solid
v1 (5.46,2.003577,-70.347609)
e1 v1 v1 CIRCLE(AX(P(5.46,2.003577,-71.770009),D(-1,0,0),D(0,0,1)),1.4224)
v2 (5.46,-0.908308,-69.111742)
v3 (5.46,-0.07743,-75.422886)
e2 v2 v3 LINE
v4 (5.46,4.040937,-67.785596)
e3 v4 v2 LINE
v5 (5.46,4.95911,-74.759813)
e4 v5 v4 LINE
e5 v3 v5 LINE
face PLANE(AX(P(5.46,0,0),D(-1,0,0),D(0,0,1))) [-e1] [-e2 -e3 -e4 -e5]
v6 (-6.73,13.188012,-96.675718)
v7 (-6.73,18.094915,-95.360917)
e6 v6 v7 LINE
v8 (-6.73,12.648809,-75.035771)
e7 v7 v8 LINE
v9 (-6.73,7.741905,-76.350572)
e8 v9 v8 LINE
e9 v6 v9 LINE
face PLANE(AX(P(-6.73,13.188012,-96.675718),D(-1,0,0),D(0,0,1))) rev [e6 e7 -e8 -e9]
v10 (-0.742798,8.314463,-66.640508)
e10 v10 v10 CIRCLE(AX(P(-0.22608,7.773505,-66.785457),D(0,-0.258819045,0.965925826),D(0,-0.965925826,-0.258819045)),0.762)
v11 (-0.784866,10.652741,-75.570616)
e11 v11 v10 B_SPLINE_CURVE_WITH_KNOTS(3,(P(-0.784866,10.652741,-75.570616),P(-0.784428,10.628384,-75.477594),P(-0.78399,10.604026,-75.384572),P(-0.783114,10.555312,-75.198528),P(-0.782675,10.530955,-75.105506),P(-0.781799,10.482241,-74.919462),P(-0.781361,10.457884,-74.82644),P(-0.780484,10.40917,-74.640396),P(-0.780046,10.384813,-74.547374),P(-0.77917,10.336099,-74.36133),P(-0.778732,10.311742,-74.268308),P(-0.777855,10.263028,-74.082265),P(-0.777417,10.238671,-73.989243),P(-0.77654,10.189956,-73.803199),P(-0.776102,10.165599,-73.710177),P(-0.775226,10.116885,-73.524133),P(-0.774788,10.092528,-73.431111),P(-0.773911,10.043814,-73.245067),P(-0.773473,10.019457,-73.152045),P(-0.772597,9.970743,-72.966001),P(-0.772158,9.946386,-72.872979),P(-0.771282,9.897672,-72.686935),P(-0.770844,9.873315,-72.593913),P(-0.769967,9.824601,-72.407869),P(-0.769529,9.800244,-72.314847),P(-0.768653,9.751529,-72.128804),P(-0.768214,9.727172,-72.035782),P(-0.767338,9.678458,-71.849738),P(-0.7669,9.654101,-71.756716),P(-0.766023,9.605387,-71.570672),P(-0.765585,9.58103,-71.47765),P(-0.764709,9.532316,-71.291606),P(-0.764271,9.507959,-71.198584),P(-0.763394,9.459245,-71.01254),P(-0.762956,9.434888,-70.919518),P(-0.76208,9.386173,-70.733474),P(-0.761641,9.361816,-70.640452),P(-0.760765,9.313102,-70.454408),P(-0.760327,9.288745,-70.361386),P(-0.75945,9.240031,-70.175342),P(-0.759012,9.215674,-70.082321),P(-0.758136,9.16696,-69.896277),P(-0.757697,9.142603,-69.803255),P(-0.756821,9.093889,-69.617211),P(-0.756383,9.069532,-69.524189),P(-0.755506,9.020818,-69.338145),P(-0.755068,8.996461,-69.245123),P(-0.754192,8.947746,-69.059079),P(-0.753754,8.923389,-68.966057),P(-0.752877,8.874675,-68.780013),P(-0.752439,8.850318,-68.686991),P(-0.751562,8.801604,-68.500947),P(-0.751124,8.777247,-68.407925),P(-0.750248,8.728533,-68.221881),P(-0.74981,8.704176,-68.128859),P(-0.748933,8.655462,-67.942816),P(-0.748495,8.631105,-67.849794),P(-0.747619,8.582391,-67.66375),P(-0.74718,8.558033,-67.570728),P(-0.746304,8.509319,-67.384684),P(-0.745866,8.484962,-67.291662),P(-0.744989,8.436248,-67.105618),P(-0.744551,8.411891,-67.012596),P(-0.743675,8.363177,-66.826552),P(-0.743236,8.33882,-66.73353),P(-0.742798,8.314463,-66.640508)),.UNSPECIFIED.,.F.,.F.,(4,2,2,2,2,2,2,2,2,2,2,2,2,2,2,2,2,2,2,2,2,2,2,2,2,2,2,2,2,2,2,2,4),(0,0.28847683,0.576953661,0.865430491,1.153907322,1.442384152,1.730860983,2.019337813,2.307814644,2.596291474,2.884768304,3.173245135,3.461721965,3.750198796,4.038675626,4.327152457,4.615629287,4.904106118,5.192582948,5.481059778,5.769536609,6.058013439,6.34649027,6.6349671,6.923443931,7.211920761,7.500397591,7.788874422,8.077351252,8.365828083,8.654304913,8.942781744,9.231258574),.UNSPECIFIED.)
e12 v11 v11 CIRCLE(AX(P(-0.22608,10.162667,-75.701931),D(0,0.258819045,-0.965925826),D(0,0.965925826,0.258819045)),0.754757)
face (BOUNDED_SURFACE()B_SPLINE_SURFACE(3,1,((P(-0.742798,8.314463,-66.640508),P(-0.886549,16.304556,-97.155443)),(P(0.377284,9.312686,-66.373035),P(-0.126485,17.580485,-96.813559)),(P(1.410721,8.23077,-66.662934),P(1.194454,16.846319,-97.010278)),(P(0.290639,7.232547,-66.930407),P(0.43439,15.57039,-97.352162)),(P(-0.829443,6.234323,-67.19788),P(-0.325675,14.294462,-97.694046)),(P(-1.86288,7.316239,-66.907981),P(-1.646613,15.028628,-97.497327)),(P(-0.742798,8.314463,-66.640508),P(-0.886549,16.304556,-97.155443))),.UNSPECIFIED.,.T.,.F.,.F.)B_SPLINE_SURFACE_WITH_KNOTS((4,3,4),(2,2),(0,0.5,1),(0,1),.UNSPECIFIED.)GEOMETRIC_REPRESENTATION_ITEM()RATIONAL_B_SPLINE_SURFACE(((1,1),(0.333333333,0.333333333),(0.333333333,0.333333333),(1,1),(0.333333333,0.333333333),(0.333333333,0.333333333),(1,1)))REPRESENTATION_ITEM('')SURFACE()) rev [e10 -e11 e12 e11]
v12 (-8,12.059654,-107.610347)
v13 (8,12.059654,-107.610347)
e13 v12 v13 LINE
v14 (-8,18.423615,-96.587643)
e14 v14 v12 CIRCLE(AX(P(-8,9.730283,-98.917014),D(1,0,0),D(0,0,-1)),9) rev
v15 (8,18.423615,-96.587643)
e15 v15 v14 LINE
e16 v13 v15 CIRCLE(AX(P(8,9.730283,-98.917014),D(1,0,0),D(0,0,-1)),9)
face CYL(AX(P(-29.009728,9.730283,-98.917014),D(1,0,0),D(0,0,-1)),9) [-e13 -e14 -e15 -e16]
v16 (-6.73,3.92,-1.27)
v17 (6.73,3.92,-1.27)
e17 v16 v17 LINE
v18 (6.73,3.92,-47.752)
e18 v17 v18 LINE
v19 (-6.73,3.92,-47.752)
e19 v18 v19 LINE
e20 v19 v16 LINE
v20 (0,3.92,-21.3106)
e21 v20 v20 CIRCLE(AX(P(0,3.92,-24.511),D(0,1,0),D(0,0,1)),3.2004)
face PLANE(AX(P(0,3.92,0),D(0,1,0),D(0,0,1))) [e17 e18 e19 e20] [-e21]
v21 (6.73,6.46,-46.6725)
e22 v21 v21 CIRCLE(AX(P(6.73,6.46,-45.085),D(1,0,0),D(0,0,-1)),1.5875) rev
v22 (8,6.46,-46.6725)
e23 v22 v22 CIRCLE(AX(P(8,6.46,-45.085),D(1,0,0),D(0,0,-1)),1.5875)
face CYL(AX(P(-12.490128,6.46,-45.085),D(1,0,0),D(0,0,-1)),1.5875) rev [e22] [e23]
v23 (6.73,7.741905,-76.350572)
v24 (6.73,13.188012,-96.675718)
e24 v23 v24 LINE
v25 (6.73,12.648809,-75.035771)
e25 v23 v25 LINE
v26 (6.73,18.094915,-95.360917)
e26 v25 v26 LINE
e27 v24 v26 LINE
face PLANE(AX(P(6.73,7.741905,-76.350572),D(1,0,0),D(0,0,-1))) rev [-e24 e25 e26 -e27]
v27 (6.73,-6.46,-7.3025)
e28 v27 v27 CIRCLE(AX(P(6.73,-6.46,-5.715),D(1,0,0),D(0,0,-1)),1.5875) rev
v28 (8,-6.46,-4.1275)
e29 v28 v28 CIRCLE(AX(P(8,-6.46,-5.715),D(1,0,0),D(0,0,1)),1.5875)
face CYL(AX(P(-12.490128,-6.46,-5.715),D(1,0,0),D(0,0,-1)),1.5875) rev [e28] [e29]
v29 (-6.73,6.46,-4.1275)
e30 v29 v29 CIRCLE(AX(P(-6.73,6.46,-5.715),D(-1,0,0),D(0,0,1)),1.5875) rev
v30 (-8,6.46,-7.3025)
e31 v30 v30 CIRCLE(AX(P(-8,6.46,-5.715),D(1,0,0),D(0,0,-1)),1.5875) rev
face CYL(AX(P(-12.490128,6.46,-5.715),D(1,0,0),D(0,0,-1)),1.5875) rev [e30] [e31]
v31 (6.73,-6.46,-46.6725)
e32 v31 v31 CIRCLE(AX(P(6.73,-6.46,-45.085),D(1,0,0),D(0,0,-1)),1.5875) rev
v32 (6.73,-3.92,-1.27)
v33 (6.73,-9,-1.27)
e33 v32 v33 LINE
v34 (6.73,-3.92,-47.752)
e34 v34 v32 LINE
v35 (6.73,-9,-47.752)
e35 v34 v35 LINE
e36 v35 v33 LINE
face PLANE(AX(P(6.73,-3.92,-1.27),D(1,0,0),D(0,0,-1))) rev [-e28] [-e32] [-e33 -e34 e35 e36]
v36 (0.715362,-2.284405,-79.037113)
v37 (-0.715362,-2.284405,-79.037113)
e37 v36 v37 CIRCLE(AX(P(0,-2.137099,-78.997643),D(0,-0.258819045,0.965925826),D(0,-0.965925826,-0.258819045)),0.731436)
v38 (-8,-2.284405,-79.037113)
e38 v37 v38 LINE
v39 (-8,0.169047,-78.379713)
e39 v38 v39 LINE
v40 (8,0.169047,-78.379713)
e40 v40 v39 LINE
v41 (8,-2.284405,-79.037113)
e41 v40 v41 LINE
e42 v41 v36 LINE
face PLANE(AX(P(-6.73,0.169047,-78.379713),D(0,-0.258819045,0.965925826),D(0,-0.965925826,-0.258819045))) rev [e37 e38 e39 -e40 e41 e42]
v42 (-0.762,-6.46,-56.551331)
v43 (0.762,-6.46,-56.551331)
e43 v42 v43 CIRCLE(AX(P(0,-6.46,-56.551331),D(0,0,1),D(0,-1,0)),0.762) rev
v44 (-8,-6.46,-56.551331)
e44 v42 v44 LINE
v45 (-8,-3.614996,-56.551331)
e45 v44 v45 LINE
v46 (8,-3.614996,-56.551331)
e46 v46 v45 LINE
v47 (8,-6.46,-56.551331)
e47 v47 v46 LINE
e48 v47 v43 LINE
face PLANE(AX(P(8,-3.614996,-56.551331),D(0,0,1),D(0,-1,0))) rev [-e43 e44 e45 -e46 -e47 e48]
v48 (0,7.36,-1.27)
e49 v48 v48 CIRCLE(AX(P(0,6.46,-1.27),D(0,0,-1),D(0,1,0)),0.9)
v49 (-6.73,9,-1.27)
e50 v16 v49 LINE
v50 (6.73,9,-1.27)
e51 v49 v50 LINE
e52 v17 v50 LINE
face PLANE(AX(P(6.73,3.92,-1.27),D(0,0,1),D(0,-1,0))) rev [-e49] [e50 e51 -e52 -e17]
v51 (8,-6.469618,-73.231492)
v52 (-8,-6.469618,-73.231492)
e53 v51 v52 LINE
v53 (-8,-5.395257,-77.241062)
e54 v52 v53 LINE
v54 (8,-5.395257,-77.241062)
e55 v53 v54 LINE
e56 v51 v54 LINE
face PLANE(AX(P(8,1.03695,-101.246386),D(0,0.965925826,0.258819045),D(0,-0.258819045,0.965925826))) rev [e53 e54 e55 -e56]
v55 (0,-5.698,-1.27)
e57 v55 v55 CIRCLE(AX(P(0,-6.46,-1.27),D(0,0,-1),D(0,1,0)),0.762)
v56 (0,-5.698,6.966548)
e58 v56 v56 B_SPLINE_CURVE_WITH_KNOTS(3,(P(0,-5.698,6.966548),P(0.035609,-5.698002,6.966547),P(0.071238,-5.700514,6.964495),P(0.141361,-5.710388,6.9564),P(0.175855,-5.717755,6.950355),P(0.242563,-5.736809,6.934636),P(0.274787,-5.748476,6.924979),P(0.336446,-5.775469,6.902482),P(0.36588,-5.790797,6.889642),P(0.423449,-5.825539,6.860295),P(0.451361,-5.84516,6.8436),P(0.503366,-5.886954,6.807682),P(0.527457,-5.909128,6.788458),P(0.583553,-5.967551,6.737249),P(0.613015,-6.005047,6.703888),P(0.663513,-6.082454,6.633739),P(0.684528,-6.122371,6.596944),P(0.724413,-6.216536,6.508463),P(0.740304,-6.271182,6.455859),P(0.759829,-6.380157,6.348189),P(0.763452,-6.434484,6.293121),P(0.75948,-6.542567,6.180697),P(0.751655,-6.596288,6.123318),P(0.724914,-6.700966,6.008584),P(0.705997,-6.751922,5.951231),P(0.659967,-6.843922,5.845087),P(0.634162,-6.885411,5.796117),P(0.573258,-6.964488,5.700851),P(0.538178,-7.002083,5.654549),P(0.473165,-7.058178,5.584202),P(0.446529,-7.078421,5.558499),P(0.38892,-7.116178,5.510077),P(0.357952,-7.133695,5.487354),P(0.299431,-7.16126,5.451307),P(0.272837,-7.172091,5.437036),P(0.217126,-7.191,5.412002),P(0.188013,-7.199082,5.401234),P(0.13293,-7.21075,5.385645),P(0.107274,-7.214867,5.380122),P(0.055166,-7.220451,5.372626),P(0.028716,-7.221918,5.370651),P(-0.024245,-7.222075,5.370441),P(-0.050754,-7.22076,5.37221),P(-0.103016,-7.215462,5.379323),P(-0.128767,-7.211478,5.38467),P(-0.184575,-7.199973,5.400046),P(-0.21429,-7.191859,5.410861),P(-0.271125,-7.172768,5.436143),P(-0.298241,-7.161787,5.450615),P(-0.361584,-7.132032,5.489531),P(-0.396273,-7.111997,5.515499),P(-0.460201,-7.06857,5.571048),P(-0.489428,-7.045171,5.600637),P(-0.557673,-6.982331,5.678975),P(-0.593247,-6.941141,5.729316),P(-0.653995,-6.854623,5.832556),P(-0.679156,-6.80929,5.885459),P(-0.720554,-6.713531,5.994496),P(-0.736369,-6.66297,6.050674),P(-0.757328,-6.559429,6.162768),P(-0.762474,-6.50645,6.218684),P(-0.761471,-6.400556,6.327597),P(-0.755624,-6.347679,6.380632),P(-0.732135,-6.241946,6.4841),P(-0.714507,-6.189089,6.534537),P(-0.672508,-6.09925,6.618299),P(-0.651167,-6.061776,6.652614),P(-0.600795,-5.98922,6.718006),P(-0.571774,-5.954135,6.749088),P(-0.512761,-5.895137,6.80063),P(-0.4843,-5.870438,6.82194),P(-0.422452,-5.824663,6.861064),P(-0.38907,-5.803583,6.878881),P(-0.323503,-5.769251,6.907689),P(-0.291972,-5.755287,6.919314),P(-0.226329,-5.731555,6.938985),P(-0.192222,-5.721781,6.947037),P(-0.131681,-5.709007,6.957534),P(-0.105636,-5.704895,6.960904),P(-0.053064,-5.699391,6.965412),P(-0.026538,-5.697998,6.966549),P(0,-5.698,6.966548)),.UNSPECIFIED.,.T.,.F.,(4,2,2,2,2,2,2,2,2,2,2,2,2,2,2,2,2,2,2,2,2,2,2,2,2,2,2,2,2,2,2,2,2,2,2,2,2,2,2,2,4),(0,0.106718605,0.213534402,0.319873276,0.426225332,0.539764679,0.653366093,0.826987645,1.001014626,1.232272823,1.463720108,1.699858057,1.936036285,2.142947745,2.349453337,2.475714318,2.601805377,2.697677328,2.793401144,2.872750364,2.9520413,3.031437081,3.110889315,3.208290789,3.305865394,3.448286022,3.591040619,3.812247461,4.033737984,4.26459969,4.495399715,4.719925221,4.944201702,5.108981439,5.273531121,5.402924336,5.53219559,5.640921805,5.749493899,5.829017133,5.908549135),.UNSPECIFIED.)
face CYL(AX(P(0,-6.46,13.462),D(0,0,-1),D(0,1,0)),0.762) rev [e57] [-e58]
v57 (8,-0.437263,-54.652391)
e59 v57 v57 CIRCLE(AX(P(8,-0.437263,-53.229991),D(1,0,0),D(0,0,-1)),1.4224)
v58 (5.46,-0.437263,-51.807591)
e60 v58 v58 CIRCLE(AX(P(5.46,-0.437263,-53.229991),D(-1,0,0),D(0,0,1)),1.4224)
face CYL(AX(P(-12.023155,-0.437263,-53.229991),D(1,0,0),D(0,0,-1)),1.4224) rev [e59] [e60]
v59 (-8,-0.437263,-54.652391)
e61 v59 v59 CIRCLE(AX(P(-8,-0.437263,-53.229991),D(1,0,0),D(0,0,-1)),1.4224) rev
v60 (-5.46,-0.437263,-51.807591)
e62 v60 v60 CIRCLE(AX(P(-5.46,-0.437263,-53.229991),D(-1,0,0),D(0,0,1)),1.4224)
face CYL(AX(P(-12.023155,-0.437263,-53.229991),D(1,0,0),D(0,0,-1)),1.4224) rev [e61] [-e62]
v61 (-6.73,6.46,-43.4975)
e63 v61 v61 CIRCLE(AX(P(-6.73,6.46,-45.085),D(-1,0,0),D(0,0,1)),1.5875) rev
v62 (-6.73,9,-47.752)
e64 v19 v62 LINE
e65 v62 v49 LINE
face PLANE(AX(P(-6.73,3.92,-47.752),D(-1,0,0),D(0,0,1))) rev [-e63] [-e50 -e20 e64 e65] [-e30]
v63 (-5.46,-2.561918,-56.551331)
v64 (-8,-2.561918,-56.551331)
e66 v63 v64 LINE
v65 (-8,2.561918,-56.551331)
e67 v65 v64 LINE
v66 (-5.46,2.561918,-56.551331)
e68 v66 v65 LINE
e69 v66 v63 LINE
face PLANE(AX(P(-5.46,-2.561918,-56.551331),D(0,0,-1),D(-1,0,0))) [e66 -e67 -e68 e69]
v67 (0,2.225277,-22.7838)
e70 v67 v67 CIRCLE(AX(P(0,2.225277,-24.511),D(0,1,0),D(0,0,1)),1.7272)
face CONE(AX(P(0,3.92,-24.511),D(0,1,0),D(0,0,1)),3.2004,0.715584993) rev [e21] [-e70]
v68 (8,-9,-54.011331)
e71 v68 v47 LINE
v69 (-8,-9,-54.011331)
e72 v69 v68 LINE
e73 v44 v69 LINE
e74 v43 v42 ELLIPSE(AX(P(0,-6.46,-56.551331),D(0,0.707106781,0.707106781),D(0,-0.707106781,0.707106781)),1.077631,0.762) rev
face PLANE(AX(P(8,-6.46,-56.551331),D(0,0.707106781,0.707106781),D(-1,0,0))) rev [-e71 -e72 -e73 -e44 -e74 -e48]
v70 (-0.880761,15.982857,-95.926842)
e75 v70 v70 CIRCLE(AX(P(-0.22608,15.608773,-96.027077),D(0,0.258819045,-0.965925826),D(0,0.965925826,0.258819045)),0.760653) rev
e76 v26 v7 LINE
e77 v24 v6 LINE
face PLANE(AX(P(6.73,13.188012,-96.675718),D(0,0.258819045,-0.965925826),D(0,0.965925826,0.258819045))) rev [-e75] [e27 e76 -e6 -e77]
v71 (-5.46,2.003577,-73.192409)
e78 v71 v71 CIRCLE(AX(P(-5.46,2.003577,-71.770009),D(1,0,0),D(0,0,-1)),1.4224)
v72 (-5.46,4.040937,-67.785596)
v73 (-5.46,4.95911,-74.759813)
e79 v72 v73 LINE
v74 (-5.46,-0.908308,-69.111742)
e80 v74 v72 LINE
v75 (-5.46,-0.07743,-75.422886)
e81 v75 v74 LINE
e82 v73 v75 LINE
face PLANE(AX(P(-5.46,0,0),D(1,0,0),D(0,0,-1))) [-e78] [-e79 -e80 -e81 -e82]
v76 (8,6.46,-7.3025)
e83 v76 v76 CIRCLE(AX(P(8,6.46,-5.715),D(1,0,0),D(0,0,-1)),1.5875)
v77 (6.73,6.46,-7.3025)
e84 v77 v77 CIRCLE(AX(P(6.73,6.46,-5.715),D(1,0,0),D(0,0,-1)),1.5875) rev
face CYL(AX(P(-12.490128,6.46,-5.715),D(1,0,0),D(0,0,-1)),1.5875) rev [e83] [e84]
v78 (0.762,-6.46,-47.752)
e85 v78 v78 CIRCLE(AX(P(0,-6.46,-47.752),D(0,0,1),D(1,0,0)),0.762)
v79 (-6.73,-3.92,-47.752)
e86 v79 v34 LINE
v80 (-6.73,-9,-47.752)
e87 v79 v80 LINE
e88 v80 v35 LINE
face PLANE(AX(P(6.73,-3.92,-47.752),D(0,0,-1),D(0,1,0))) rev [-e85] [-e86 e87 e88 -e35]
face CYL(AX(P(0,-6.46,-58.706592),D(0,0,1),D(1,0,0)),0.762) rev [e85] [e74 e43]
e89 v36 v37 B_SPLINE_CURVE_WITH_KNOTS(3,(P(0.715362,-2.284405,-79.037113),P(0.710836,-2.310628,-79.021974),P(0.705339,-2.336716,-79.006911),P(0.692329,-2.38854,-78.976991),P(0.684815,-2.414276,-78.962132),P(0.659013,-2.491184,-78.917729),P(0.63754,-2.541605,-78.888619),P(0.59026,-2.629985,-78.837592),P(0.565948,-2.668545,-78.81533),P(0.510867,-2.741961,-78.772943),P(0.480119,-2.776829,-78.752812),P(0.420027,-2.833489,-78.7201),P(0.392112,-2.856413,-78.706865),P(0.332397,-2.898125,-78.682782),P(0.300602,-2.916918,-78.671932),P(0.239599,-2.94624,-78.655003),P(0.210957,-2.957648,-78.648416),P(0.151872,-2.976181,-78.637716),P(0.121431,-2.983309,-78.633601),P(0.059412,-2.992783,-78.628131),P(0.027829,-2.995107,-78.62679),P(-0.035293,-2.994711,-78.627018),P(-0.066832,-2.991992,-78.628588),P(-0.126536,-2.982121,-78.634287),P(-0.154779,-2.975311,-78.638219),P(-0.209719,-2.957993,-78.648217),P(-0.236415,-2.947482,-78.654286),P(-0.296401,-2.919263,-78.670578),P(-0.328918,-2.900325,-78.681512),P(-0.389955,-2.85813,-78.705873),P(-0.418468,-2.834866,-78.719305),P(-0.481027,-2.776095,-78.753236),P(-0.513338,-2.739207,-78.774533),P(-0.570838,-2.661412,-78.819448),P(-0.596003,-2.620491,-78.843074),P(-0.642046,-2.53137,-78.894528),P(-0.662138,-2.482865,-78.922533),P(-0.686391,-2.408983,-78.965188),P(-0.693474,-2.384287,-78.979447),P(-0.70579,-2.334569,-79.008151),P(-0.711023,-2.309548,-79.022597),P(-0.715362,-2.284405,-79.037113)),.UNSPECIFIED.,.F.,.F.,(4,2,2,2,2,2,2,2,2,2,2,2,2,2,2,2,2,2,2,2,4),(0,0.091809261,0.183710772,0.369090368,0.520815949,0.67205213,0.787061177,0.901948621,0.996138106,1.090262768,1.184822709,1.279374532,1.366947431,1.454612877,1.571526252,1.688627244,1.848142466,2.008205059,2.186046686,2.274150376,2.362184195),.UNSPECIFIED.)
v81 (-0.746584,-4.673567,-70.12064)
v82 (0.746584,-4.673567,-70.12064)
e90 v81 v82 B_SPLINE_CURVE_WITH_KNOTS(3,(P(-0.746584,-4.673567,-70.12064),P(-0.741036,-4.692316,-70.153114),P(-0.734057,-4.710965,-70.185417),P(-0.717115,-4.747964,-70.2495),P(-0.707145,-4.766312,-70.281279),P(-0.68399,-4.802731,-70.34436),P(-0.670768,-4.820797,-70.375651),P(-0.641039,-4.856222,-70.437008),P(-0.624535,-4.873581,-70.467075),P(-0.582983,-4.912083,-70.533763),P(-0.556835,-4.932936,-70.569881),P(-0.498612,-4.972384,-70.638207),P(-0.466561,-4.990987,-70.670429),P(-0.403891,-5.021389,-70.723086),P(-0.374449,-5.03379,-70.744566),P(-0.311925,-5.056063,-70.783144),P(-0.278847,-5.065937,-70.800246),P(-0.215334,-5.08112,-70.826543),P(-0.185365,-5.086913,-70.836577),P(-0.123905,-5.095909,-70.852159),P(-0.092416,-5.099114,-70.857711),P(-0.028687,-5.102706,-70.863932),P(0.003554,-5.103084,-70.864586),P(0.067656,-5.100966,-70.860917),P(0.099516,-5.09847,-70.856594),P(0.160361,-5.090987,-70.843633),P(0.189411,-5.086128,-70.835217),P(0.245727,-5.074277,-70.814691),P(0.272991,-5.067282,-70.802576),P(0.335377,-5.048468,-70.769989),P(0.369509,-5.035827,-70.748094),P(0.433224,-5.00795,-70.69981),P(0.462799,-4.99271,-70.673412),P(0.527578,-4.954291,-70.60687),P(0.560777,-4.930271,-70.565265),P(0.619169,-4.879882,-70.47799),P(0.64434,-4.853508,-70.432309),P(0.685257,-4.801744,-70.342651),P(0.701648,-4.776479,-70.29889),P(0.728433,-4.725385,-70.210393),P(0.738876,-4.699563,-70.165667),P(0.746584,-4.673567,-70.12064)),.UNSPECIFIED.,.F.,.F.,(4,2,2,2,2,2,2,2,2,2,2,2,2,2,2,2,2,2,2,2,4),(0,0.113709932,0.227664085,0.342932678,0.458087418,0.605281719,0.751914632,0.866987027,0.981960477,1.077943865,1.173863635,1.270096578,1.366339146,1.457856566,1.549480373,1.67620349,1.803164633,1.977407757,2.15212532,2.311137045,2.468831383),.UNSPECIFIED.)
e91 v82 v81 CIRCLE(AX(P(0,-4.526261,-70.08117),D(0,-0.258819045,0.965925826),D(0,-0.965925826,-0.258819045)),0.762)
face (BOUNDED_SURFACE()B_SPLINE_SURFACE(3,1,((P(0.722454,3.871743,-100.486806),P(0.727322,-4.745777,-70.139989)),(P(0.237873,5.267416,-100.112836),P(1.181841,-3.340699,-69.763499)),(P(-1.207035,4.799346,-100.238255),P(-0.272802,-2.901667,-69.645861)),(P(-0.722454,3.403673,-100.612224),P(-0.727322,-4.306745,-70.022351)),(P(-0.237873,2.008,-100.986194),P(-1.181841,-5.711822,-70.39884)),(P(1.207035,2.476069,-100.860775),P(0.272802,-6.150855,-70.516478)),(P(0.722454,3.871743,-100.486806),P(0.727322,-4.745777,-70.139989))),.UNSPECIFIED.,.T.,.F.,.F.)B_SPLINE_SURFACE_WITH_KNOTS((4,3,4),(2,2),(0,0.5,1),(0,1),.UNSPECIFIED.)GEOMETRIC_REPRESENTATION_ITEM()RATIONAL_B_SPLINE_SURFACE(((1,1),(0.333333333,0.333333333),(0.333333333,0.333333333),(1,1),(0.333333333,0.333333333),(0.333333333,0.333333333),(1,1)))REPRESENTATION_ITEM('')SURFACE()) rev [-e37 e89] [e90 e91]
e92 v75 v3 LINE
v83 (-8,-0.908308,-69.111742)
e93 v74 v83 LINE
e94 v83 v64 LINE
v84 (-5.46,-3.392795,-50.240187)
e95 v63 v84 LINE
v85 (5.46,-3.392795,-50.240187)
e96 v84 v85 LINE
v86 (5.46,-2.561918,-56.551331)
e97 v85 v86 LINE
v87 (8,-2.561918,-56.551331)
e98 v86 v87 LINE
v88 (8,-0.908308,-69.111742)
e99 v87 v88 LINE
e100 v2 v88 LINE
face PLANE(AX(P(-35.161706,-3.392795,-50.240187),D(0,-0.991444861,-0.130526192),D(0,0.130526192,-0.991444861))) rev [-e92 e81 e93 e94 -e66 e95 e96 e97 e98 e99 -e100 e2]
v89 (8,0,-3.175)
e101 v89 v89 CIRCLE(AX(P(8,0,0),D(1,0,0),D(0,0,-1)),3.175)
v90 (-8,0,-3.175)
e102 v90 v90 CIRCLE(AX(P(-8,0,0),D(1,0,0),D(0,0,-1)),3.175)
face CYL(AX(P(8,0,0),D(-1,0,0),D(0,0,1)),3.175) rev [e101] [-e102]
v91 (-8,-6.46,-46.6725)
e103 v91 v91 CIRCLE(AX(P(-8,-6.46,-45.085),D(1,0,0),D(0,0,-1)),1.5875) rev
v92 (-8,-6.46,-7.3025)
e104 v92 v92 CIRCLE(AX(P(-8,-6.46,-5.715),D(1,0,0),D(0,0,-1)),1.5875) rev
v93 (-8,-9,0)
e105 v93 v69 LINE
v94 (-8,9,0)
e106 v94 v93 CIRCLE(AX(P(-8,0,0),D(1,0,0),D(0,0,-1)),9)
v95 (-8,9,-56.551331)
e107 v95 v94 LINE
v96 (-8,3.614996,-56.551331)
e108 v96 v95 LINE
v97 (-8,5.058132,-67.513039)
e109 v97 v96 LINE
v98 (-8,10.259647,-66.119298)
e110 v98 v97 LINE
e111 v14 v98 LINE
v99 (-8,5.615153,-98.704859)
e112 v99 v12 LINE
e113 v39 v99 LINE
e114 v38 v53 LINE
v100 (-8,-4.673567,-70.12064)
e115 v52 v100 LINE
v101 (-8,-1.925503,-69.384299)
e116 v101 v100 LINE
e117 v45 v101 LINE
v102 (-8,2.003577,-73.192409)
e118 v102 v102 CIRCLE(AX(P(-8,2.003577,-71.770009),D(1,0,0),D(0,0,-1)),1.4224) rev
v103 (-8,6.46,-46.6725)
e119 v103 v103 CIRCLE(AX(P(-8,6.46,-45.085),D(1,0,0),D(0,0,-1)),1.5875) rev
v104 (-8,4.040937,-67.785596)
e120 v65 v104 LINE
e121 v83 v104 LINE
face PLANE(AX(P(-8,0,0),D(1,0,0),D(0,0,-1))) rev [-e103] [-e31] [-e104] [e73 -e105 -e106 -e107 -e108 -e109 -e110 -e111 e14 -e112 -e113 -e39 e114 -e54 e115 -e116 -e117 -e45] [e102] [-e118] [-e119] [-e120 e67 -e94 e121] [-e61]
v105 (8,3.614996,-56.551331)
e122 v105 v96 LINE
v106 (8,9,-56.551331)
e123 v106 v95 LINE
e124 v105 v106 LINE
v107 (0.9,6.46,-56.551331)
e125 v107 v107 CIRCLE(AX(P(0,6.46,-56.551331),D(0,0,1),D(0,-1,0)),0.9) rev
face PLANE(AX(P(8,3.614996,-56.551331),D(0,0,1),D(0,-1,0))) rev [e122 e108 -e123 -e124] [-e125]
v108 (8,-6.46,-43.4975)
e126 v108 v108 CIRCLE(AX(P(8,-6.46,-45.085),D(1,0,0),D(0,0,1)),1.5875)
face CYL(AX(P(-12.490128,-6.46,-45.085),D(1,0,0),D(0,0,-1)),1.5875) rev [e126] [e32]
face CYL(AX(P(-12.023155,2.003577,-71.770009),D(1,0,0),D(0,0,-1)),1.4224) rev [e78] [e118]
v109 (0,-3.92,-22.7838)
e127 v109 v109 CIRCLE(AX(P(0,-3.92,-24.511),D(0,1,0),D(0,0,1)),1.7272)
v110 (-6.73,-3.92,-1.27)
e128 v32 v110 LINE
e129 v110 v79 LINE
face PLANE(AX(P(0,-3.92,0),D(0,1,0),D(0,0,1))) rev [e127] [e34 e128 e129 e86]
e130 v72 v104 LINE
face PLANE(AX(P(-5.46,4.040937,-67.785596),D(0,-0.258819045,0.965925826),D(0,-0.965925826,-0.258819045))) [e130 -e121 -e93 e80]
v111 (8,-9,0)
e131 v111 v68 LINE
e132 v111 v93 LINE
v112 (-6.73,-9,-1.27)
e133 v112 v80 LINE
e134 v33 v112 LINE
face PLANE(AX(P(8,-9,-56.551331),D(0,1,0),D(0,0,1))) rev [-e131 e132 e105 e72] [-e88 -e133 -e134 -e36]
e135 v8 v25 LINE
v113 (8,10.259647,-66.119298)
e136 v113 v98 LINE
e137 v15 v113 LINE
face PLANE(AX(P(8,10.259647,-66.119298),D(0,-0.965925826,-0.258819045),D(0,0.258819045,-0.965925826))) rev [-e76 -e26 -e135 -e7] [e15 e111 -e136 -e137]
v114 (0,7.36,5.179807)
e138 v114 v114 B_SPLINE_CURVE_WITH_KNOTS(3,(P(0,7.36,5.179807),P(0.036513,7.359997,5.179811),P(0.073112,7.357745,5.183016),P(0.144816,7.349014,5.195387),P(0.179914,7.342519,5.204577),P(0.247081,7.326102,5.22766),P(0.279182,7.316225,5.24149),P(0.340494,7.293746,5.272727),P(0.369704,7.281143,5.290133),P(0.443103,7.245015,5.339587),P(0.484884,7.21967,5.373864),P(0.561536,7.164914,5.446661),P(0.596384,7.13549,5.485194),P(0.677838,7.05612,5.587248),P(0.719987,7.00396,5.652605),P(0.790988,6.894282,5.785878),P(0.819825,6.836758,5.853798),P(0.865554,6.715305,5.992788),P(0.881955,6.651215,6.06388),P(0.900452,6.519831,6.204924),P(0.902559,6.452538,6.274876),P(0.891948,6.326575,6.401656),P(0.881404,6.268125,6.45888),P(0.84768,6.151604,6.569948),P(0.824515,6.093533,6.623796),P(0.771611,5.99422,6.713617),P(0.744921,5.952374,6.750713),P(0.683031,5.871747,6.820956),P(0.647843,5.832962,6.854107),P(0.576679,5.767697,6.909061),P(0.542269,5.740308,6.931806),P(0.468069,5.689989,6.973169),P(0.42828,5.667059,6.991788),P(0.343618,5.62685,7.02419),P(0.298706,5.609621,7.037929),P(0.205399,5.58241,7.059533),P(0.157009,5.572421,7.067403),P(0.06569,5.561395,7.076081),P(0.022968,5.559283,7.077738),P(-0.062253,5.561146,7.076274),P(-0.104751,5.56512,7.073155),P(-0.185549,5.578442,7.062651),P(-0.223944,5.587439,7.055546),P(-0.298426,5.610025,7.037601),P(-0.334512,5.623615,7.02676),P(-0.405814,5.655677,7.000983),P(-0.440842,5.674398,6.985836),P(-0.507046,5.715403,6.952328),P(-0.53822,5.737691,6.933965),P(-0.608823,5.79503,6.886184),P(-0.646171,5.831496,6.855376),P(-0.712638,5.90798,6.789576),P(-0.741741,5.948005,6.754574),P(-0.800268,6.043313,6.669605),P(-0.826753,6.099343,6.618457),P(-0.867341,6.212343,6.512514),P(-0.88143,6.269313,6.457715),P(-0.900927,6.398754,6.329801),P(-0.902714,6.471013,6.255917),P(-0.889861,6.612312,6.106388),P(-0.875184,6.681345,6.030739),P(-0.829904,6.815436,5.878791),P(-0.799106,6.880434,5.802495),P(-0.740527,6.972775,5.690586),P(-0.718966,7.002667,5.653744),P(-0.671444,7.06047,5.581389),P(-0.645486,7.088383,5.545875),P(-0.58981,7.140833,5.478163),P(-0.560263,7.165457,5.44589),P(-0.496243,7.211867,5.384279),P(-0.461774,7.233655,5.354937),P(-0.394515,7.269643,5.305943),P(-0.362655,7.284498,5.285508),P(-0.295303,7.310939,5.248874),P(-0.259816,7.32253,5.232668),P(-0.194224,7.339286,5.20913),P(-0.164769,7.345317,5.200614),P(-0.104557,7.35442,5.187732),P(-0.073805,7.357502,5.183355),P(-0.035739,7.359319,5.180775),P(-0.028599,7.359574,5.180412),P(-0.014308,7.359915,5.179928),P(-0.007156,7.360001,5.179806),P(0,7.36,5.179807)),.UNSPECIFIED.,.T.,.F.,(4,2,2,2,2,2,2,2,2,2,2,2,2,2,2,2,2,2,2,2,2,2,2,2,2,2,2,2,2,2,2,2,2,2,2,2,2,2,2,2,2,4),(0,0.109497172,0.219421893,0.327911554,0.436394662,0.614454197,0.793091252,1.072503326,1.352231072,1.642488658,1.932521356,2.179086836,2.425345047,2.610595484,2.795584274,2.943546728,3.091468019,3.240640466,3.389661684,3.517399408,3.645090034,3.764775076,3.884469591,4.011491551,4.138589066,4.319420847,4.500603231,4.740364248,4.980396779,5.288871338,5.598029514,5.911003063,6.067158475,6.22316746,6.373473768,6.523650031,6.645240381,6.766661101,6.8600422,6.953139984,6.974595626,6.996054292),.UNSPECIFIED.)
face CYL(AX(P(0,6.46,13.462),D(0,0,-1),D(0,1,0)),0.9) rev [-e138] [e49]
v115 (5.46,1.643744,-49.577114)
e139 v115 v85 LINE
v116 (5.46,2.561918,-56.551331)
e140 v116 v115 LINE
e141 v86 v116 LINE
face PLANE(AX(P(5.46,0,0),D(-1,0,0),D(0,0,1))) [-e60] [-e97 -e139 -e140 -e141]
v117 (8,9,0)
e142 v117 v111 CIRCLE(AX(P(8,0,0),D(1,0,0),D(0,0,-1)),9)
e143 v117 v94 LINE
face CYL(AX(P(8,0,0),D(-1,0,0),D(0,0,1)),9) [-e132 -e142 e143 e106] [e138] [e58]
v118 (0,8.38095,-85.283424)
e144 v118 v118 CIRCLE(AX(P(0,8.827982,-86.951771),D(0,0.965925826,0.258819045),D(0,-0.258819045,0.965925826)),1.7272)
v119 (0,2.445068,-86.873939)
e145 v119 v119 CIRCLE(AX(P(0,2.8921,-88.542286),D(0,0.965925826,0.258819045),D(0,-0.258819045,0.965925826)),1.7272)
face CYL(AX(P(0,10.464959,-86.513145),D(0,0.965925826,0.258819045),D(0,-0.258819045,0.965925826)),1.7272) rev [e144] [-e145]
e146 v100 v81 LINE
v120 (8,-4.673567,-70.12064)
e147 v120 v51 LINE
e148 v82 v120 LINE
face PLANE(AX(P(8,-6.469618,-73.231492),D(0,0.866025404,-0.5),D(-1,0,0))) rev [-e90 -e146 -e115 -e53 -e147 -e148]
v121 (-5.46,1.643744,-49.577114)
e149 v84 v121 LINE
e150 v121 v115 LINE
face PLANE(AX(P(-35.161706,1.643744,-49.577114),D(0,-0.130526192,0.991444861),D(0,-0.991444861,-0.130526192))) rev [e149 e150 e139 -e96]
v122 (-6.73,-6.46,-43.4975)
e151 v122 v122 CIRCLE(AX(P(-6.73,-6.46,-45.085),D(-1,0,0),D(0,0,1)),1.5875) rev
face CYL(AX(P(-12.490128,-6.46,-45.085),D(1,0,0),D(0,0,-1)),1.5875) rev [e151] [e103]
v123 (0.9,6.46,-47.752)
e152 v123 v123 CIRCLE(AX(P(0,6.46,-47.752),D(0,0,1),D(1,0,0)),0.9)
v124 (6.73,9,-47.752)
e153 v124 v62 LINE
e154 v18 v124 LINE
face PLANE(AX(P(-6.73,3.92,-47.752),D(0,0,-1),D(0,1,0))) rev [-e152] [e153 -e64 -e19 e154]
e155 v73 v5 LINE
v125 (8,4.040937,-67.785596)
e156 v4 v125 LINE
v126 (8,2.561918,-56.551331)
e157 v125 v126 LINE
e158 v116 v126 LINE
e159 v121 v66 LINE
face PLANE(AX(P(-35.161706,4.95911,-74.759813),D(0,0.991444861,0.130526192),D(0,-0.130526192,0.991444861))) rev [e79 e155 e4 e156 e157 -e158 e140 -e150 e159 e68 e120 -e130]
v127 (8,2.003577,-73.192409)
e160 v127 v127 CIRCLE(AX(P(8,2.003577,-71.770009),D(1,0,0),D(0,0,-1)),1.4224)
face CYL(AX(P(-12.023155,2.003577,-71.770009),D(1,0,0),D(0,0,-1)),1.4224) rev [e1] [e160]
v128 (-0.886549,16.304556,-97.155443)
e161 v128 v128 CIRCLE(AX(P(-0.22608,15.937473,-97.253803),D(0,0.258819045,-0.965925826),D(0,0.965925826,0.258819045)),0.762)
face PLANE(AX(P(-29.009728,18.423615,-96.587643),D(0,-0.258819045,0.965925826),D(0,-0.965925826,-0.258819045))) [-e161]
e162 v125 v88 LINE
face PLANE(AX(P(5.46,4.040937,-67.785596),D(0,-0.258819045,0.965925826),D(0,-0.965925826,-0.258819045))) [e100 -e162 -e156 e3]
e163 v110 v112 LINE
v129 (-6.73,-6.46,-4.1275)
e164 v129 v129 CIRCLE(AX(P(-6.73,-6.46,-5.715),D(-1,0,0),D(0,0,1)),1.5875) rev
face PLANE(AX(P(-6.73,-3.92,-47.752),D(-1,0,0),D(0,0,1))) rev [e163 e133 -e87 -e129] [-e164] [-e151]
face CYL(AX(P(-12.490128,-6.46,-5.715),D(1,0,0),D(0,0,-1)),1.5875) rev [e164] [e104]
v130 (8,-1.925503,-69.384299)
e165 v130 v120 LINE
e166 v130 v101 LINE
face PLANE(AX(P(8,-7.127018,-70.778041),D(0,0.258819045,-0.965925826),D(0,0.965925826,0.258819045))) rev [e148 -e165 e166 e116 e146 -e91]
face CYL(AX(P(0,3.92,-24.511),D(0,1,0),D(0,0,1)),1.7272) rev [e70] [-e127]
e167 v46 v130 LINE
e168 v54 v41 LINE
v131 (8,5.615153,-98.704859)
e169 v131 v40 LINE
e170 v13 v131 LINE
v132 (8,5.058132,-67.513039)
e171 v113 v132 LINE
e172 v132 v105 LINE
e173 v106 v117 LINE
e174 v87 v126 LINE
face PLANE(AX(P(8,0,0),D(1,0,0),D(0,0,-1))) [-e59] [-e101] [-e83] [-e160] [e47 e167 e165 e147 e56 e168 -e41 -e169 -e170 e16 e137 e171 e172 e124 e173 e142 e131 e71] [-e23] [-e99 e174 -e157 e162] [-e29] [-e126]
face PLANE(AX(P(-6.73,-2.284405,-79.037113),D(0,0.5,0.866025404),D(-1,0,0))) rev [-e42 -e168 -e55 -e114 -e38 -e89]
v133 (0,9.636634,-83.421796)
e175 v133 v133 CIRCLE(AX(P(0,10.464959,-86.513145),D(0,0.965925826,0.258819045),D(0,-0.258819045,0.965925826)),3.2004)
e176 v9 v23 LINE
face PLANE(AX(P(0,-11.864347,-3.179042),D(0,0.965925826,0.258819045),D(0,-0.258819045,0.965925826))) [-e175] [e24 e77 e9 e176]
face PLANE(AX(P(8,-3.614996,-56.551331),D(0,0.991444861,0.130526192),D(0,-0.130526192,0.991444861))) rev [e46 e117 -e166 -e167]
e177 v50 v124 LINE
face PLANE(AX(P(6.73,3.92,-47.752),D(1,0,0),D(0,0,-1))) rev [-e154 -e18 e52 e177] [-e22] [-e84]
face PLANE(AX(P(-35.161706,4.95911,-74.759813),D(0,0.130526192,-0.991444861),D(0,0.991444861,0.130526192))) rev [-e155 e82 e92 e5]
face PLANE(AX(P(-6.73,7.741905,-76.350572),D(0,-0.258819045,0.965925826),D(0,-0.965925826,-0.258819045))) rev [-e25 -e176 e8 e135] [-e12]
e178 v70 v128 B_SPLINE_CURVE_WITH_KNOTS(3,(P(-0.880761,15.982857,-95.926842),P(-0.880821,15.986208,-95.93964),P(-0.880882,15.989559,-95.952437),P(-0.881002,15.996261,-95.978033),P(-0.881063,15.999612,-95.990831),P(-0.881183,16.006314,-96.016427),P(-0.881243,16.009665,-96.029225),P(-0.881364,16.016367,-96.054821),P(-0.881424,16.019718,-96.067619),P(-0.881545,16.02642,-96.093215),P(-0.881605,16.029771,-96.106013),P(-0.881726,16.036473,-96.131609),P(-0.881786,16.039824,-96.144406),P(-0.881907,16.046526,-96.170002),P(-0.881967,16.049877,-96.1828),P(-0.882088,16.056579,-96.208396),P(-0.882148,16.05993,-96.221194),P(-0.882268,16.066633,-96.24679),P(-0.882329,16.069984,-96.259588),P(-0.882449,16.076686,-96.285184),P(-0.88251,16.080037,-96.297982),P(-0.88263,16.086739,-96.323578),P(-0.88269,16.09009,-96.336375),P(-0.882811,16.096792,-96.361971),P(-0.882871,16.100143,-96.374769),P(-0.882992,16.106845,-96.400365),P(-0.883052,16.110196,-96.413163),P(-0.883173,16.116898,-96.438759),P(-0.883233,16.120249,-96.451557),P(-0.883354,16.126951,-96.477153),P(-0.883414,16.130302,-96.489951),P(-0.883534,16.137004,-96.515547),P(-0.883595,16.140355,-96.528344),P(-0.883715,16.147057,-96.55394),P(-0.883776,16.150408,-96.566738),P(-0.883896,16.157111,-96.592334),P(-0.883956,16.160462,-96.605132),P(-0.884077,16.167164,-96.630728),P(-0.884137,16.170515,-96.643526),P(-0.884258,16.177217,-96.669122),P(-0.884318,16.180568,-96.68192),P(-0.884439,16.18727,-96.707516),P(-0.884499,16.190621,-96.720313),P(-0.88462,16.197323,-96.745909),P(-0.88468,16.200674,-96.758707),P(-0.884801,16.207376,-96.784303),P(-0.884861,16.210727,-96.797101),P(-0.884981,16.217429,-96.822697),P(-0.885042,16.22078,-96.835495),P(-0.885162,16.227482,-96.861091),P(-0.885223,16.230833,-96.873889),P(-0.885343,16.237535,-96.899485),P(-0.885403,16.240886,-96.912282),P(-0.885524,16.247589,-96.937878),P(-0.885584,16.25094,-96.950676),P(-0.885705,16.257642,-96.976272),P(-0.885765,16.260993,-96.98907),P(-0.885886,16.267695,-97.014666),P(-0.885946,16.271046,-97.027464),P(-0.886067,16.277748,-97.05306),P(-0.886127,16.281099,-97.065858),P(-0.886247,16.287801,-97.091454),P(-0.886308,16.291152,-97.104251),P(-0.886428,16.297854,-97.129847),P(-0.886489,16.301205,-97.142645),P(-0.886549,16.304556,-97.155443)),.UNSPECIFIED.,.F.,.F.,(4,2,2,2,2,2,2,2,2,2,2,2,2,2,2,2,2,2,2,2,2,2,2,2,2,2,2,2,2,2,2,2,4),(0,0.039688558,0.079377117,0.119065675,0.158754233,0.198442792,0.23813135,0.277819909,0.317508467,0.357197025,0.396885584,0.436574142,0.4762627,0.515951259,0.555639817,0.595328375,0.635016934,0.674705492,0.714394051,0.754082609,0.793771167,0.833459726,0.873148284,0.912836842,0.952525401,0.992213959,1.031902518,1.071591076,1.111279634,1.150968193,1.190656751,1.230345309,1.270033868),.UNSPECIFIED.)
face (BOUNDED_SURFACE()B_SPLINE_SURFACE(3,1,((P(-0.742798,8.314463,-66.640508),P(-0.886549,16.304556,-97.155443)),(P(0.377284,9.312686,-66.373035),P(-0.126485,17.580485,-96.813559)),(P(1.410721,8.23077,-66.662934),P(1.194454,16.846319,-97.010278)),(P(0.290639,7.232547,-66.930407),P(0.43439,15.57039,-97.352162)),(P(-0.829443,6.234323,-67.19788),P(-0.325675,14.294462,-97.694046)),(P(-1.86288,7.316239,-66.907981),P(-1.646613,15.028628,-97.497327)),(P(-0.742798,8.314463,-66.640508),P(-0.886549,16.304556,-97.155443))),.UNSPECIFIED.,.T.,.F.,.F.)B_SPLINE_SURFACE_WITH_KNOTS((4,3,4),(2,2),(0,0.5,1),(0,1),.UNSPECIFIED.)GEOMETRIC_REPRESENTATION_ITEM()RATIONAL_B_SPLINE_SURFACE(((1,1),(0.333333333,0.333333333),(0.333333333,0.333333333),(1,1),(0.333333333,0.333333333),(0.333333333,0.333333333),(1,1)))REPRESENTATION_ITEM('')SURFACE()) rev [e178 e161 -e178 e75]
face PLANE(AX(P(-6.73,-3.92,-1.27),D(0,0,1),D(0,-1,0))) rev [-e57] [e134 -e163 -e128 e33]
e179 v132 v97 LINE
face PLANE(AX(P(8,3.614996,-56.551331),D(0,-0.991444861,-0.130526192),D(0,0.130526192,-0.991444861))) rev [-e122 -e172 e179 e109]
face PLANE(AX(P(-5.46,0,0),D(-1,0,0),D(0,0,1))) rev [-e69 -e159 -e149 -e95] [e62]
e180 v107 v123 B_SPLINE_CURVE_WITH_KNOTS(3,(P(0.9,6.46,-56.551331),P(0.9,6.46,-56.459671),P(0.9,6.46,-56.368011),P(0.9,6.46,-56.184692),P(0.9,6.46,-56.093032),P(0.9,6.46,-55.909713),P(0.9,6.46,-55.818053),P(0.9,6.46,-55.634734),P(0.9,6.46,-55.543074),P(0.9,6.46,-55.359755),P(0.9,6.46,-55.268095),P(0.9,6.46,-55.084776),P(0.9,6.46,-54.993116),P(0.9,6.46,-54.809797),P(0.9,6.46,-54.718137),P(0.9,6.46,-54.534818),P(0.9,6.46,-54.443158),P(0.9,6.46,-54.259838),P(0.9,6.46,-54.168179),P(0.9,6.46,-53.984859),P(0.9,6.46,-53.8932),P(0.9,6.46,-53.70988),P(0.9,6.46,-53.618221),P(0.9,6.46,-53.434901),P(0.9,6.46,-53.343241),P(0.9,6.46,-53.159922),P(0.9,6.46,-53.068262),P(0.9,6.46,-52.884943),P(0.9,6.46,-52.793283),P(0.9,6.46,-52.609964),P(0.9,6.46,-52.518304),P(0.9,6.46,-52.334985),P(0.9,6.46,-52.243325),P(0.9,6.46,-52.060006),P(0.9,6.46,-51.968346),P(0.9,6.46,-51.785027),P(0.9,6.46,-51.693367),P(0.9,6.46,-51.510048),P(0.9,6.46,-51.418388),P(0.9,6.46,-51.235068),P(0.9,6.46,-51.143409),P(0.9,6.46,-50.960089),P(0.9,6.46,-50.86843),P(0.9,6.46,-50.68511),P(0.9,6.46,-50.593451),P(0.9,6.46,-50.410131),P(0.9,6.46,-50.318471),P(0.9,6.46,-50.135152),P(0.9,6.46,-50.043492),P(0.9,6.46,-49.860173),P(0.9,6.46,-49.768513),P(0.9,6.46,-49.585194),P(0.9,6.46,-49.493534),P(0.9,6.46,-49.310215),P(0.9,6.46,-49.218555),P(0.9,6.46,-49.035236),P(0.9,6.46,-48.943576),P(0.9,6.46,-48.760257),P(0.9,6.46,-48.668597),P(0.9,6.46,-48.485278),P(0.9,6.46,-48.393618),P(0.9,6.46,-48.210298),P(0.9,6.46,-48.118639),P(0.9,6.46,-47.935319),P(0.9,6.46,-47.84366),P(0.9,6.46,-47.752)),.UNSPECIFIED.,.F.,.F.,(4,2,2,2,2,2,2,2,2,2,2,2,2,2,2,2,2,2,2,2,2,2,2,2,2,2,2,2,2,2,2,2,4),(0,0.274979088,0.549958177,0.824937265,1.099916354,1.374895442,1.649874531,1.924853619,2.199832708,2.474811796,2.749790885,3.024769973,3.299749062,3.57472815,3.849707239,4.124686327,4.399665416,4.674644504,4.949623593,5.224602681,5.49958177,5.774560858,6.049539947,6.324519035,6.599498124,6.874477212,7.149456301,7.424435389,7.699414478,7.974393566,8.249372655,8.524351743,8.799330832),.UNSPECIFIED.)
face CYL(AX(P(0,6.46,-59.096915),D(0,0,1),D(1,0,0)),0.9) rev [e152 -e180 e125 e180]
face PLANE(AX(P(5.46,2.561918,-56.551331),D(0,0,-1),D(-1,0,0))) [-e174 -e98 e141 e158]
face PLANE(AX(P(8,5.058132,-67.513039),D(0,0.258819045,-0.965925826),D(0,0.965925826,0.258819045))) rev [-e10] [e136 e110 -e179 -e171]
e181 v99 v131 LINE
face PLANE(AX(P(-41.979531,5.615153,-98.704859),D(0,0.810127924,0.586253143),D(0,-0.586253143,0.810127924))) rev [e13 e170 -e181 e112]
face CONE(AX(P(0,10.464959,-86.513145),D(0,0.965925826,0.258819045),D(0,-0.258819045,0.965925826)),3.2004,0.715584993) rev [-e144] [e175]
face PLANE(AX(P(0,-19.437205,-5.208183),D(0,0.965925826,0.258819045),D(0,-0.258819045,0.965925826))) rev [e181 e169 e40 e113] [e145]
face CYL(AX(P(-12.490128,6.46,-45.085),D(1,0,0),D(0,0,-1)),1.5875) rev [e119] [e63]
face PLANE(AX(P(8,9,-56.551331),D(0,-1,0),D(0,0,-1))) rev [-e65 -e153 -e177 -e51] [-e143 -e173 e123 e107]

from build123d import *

# Parameters (mm, degrees)
SKETCH1_R                                      = 3.175
FINGER_FRAME_DEPTH                             = 8
SKETCH31_R                                     = 1.5875
F_1ST_DIGIT_DOWEL_PINS_DEPTH                   = 16
SKETCH32_W                                     = 13.46
SKETCH32_H                                     = 46.482
F_1ST_DIGIT_TOP_SURFACE_CUTAWAY_DEPTH          = 5.08
SKETCH33_W                                     = 13.46
SKETCH33_H                                     = 46.482
F_1ST_DIGIT_BOTTOM_SURFACE_CUTAWAY_DEPTH       = 5.08
SKETCH34_R                                     = 0.9
F_1ST_DIGIT_INLET_HOLE_DEPTH                   = 14.732
F_1ST_START                                    = -8.799330832
SKETCH35_R                                     = 0.9
F_1ST_DIGIT_OUTLET_HOLE_DEPTH                  = 8.799330832
F_1ST_DIGIT_INLET_HOLE_EXTENSOR_DEPTH          = 14.732
SKETCH37_R                                     = 0.762
F_1ST_DIGIT_OUTLET_HOLE_EXTENSOR_DEPTH         = 8.799330832
WAFFLE_AREA_DEPTH                              = 16
SKETCH52_W                                     = 13.46
SKETCH52_H                                     = 21.042139732
CUT_EXTRUDE12_DEPTH                            = 5.08
SKETCH53_W                                     = 13.46
SKETCH53_H                                     = 21.042139732
CUT_EXTRUDE13_DEPTH                            = 5.08
BOSS_EXTRUDE1_DEPTH                            = 16
CUT_EXTRUDE14_DEPTH                            = 16
CHAMFER2_SIZE                                  = 2.54
CSK_FOR_5_FLAT_HEAD_MACHINE_SCREW5_D           = 3.4544
CSK_FOR_5_FLAT_HEAD_MACHINE_SCREW5_CSINK_D     = 6.4008
CSK_FOR_5_FLAT_HEAD_MACHINE_SCREW5_CSINK_ANGLE = 82
CSK_FOR_5_FLAT_HEAD_MACHINE_SCREW6_D           = 3.4544
CSK_FOR_5_FLAT_HEAD_MACHINE_SCREW6_CSINK_D     = 6.4008
CSK_FOR_5_FLAT_HEAD_MACHINE_SCREW6_CSINK_ANGLE = 82
BOSS_EXTRUDE2_DEPTH                            = 2.54
BOSS_EXTRUDE3_DEPTH                            = 2.54
CUT_EXTRUDE15_START                            = -16
SKETCH64_R                                     = 1.4224
CUT_EXTRUDE15_DEPTH                            = 16


with BuildPart() as part:
    # Sketch1 → Finger Frame (new, symmetric)
    with BuildSketch(Plane(origin=(0, 0, 0), x_dir=(0, 0, -1), z_dir=(1, 0, 0))):
        with BuildLine():
            Line((56.551330832, 3.614995505), (67.513039484, 5.058131827))
            Line((67.513039484, 5.058131827), (66.119297762, 10.259646743))
            Line((66.119297762, 10.259646743), (96.587643055, 18.423615259))
            Line((96.587643055, 18.423615259), (101.246385867, 1.036950386))
            Line((101.246385867, 1.036950386), (70.778040574, -7.12701813))
            Line((70.778040574, -7.12701813), (69.384298853, -1.925503214))
            Line((69.384298853, -1.925503214), (56.551330832, -3.614995505))
            Line((56.551330832, -3.614995505), (56.551330832, -9))
            Line((56.551330832, -9), (0, -9))
            ThreePointArc((0, -9), (-9, 0), (0, 9))
            Line((0, 9), (56.551330832, 9))
            Line((56.551330832, 9), (56.551330832, 3.614995505))
        make_face()
        Circle(SKETCH1_R, mode=Mode.SUBTRACT)
    extrude(amount=FINGER_FRAME_DEPTH, both=True)

    # Sketch31 → 1st Digit Dowel Pins (cut)
    with BuildSketch(Plane(origin=(8, 0, 0), x_dir=(0, 0, -1), z_dir=(1, 0, 0))):
        with Locations((5.715, 6.46)):
            Circle(SKETCH31_R)
        with Locations((45.085, 6.46)):
            Circle(SKETCH31_R)
        with Locations((45.085, -6.46)):
            Circle(SKETCH31_R)
        with Locations((5.715, -6.46)):
            Circle(SKETCH31_R)
    extrude(amount=-F_1ST_DIGIT_DOWEL_PINS_DEPTH, mode=Mode.SUBTRACT)

    # Sketch32 → 1st Digit Top Surface Cutaway (cut)
    with BuildSketch(Plane(origin=(0, 9, 0), x_dir=(1, 0, 0), z_dir=(0, 1, 0))):
        with Locations((0, 24.511)):
            Rectangle(SKETCH32_W, SKETCH32_H)
    extrude(amount=-F_1ST_DIGIT_TOP_SURFACE_CUTAWAY_DEPTH, mode=Mode.SUBTRACT)

    # Sketch33 → 1st Digit Bottom Surface Cutaway (cut)
    with BuildSketch(Plane.XZ.offset(9)):
        with Locations((0, -24.511)):
            Rectangle(SKETCH33_W, SKETCH33_H)
    extrude(amount=-F_1ST_DIGIT_BOTTOM_SURFACE_CUTAWAY_DEPTH, mode=Mode.SUBTRACT)

    # Sketch34 → 1st Digit Inlet Hole (cut)
    with BuildSketch(Plane(origin=(0, 0, -1.27), x_dir=(-1, 0, 0), z_dir=(0, 0, -1))):
        with Locations(Location((0, 6.46, 0), (0, 0, 90))):
            Circle(SKETCH34_R)
    extrude(amount=-F_1ST_DIGIT_INLET_HOLE_DEPTH, mode=Mode.SUBTRACT)

    # Sketch35 → 1st Digit Outlet Hole (cut)
    with BuildSketch(Plane.XY.offset(-47.752).offset(F_1ST_START)):
        with Locations(Location((0, 6.46, 0), (0, 0, 90))):
            Circle(SKETCH35_R)
    extrude(amount=F_1ST_DIGIT_OUTLET_HOLE_DEPTH, mode=Mode.SUBTRACT)

    # Sketch36 → 1st Digit Inlet Hole Extensor (cut)
    with BuildSketch(Plane(origin=(0, 0, -1.27), x_dir=(-1, 0, 0), z_dir=(0, 0, -1))):
        with BuildLine():
            ThreePointArc((0, -5.698), (-0.762, -6.46), (0, -7.222))
            Line((0, -7.222), (0, -5.698))
        make_face()
        with BuildLine():
            Line((0, -5.698), (0, -7.222))
            ThreePointArc((0, -7.222), (0.538815367, -6.998815367), (0.762, -6.46))
            ThreePointArc((0.762, -6.46), (0.538815367, -5.921184633), (0, -5.698))
        make_face()
    extrude(amount=-F_1ST_DIGIT_INLET_HOLE_EXTENSOR_DEPTH, mode=Mode.SUBTRACT)

    # Sketch37 → 1st Digit Outlet Hole Extensor (cut)
    with BuildSketch(Plane.XY.offset(-47.752).offset(F_1ST_START)):
        with Locations(Location((0, -6.46, 0), (0, 0, 90))):
            Circle(SKETCH37_R)
    extrude(amount=F_1ST_DIGIT_OUTLET_HOLE_EXTENSOR_DEPTH, mode=Mode.SUBTRACT)

    # Sketch38 → Waffle Area (cut)
    with BuildSketch(Plane(origin=(8, 0, 0), x_dir=(0, 0, -1), z_dir=(1, 0, 0))):
        Polygon((74.759813211, 4.959109742), (49.577113732, 1.64374446), (50.240186789, -3.392795436), (75.422886268, -0.077430153), align=None)
    extrude(amount=-WAFFLE_AREA_DEPTH, mode=Mode.SUBTRACT)

    # Cut-Loft1: read off the stored shape, not the designer's step
    # Cut-Loft1: loft between two sections, ruled curve by curve
    cut_loft1_from = [
        Edge.make_bspline([(-0.742798257, 8.314462866, -66.640508211), (0.377283736, 9.312686492, -66.373034997), (1.410720879, 8.230770367, -66.662933549), (0.290638886, 7.232546741, -66.930406763), (-0.829443108, 6.234323115, -67.197879978), (-1.86288025, 7.31623924, -66.907981426), (-0.742798257, 8.314462866, -66.640508211)], [0, 0, 0, 0, 0.5, 0.5, 0.5, 1, 1, 1, 1], 3, [1, 0.333333333, 0.333333333, 1, 0.333333333, 0.333333333, 1]),
    ]
    cut_loft1_to = [
        Edge.make_bspline([(-0.886548909, 16.30455615, -97.155443232), (-0.126484689, 17.580484711, -96.813559205), (1.194453758, 16.84631905, -97.010278301), (0.434389538, 15.570390489, -97.352162328), (-0.325674683, 14.294461929, -97.694046356), (-1.64661313, 15.028627589, -97.49732726), (-0.886548909, 16.30455615, -97.155443232)], [0, 0, 0, 0, 0.5, 0.5, 0.5, 1, 1, 1, 1], 3, [1, 0.333333333, 0.333333333, 1, 0.333333333, 0.333333333, 1]),
    ]
    cut_loft1 = Solid(Shell([*[Face.make_surface_from_curves(cut_loft1_from[k], cut_loft1_to[k]) for k in range(1)], Face(Wire(cut_loft1_from)), Face(Wire(cut_loft1_to))]))
    add(cut_loft1, mode=Mode.SUBTRACT)

    # Sketch52 → Cut-Extrude12 (cut)
    with BuildSketch(Plane(origin=(0, -6.957443712, -1.864241424), x_dir=(1, 0, 0), z_dir=(0, 0.9659258262890682, 0.25881904510252135))):
        with Locations((0, 86.27381157)):
            Rectangle(SKETCH52_W, SKETCH52_H)
    extrude(amount=-CUT_EXTRUDE12_DEPTH, mode=Mode.SUBTRACT)

    # Sketch53 → Cut-Extrude13 (cut)
    with BuildSketch(Plane(origin=(0, -24.344108585, -6.522984236), x_dir=(1, 0, 0), z_dir=(0, -0.9659258262890681, -0.25881904510252135))):
        with Locations((0, -86.27381157)):
            Rectangle(SKETCH53_W, SKETCH53_H)
    extrude(amount=-CUT_EXTRUDE13_DEPTH, mode=Mode.SUBTRACT)

    # Cut-Loft2: read off the stored shape, not the designer's step
    # Cut-Loft2: loft between two sections, ruled curve by curve
    cut_loft2_from = [
        Edge.make_bspline([(0.722453651, 3.871742568, -100.486805591), (0.237872501, 5.267415847, -100.112836063), (-1.207034801, 4.799346399, -100.238254894), (-0.722453651, 3.40367312, -100.612224422), (-0.237872501, 2.007999841, -100.98619395), (1.207034801, 2.476069289, -100.860775119), (0.722453651, 3.871742568, -100.486805591)], [0, 0, 0, 0, 0.5, 0.5, 0.5, 1, 1, 1, 1], 3, [1, 0.333333333, 0.333333333, 1, 0.333333333, 0.333333333, 1]),
    ]
    cut_loft2_to = [
        Edge.make_bspline([(0.727321774, -4.745776824, -70.139988889), (1.181841462, -3.340699053, -69.763499435), (-0.272802087, -2.901666748, -69.645861084), (-0.727321774, -4.306744519, -70.022350538), (-1.181841462, -5.711822291, -70.398839992), (0.272802087, -6.150854596, -70.516478344), (0.727321774, -4.745776824, -70.139988889)], [0, 0, 0, 0, 0.5, 0.5, 0.5, 1, 1, 1, 1], 3, [1, 0.333333333, 0.333333333, 1, 0.333333333, 0.333333333, 1]),
    ]
    cut_loft2 = Solid(Shell([*[Face.make_surface_from_curves(cut_loft2_from[k], cut_loft2_to[k]) for k in range(1)], Face(Wire(cut_loft2_from)), Face(Wire(cut_loft2_to))]))
    add(cut_loft2, mode=Mode.SUBTRACT)

    # Cut-Loft2 2: loft between two sections, ruled curve by curve
    cut_loft2_2_from = [
        Edge.make_bspline([(0.722453651, 3.871742568, -100.486805591), (0.237872501, 5.267415847, -100.112836063), (-1.207034801, 4.799346399, -100.238254894), (-0.722453651, 3.40367312, -100.612224422), (-0.237872501, 2.007999841, -100.98619395), (1.207034801, 2.476069289, -100.860775119), (0.722453651, 3.871742568, -100.486805591)], [0, 0, 0, 0, 0.5, 0.5, 0.5, 1, 1, 1, 1], 3, [1, 0.333333333, 0.333333333, 1, 0.333333333, 0.333333333, 1]),
    ]
    cut_loft2_2_to = [
        Edge.make_bspline([(0.727321774, -4.745776824, -70.139988889), (1.181841462, -3.340699053, -69.763499435), (-0.272802087, -2.901666748, -69.645861084), (-0.727321774, -4.306744519, -70.022350538), (-1.181841462, -5.711822291, -70.398839992), (0.272802087, -6.150854596, -70.516478344), (0.727321774, -4.745776824, -70.139988889)], [0, 0, 0, 0, 0.5, 0.5, 0.5, 1, 1, 1, 1], 3, [1, 0.333333333, 0.333333333, 1, 0.333333333, 0.333333333, 1]),
    ]
    cut_loft2_2 = Solid(Shell([*[Face.make_surface_from_curves(cut_loft2_2_from[k], cut_loft2_2_to[k]) for k in range(1)], Face(Wire(cut_loft2_2_from)), Face(Wire(cut_loft2_2_to))]))
    add(cut_loft2_2, mode=Mode.SUBTRACT)

    # Sketch56 → Boss-Extrude1 (add)
    with BuildSketch(Plane(origin=(8, 0, 0), x_dir=(0, 0, -1), z_dir=(1, 0, 0))):
        with BuildLine():
            Line((96.587643055, 18.423615259), (101.246385867, 1.036950386))
            ThreePointArc((101.246385867, 1.036950386), (107.610346898, 12.059654228), (96.587643055, 18.423615259))
        make_face()
    extrude(amount=-BOSS_EXTRUDE1_DEPTH)

    # Sketch57 → Cut-Extrude14 (cut)
    with BuildSketch(Plane(origin=(8, 0, 0), x_dir=(0, 0, -1), z_dir=(1, 0, 0))):
        with BuildLine():
            Line((78.379713111, 0.169046884), (79.69451386, -4.737856314))
            Line((79.69451386, -4.737856314), (101.246385867, 1.036950386))
            ThreePointArc((101.246385867, 1.036950386), (106.711243095, 5.230282823), (107.610346898, 12.059654228))
            Line((107.610346898, 12.059654228), (98.704859318, 5.615153396))
            Line((98.704859318, 5.615153396), (78.379713111, 0.169046884))
        make_face()
    extrude(amount=-CUT_EXTRUDE14_DEPTH, mode=Mode.SUBTRACT)

    # Chamfer2
    # the kernel refuses this chamfer: 2.54 mm, written as the material it takes off along each edge
    with BuildSketch(Plane(origin=(-14.532074789, -4.737856314, -79.69451386), x_dir=(0, 0.9659258262890676, 0.25881904510252346), z_dir=(1, 0, 0))) as chamfer2_piece_1:
        Polygon((CHAMFER2_SIZE, 0), (0, CHAMFER2_SIZE), (0, 0), align=None)
    extrude(amount=29.064149579, mode=Mode.SUBTRACT)
    with BuildSketch(Plane(origin=(14.532074789, -7.12701813, -70.778040574), x_dir=(0, 0.25881904510252146, -0.9659258262890681), z_dir=(-1, 0, 0)), Plane(origin=(14.532074789, -9, -56.551330832), x_dir=(0, 1, 0), z_dir=(-1, 0, 0))) as chamfer2_piece_2:
        Polygon((CHAMFER2_SIZE, 0), (0, -CHAMFER2_SIZE), (0, 0), align=None)
    extrude(amount=29.064149579, mode=Mode.SUBTRACT)

    # CSK for #5 Flat Head Machine Screw5 (through all)
    with Locations(Plane(origin=(0, 3.92, 0), x_dir=(1, 0, 0), z_dir=(0, 1, 0))):
        with Locations((0, 24.511)):
            CounterSinkHole(CSK_FOR_5_FLAT_HEAD_MACHINE_SCREW5_D / 2, CSK_FOR_5_FLAT_HEAD_MACHINE_SCREW5_CSINK_D / 2, counter_sink_angle=CSK_FOR_5_FLAT_HEAD_MACHINE_SCREW5_CSINK_ANGLE)

    # CSK for #5 Flat Head Machine Screw6 (through all)
    with Locations(Plane(origin=(0, -11.86434691, -3.179042173), x_dir=(1, 0, 0), z_dir=(0, 0.9659258262890682, 0.25881904510252124))):
        with Locations((0, 86.27381157)):
            CounterSinkHole(CSK_FOR_5_FLAT_HEAD_MACHINE_SCREW6_D / 2, CSK_FOR_5_FLAT_HEAD_MACHINE_SCREW6_CSINK_D / 2, counter_sink_angle=CSK_FOR_5_FLAT_HEAD_MACHINE_SCREW6_CSINK_ANGLE)

    # Sketch62 → Boss-Extrude2 (add)
    with BuildSketch(Plane(origin=(8, 0, 0), x_dir=(0, 0, -1), z_dir=(1, 0, 0))):
        Polygon((56.551330832, 2.56191756), (56.551330832, -2.56191756), (50.240186789, -3.392795436), (49.577113732, 1.64374446), align=None)
        Polygon((67.785596112, 4.040936643), (69.111742225, -0.908308029), (75.422886268, -0.077430153), (74.759813211, 4.959109742), align=None)
    extrude(amount=-BOSS_EXTRUDE2_DEPTH)

    # Sketch63 → Boss-Extrude3 (add)
    with BuildSketch(Plane.ZY.offset(8)):
        Polygon((-75.422886268, -0.077430153), (-74.759813211, 4.959109742), (-67.785596112, 4.040936643), (-69.111742225, -0.908308029), align=None)
        Polygon((-56.551330832, -2.56191756), (-56.551330832, 2.56191756), (-49.577113732, 1.64374446), (-50.240186789, -3.392795436), align=None)
    extrude(amount=-BOSS_EXTRUDE3_DEPTH)

    # Sketch64 → Cut-Extrude15 (cut)
    with BuildSketch(Plane(origin=(8, 0, 0), x_dir=(0, 0, -1), z_dir=(1, 0, 0)).offset(CUT_EXTRUDE15_START)):
        with Locations((71.770009454, 2.003577051)):
            Circle(SKETCH64_R)
        with Locations((53.229990546, -0.437262744)):
            Circle(SKETCH64_R)
    extrude(amount=CUT_EXTRUDE15_DEPTH, mode=Mode.SUBTRACT)


solid = part.part
